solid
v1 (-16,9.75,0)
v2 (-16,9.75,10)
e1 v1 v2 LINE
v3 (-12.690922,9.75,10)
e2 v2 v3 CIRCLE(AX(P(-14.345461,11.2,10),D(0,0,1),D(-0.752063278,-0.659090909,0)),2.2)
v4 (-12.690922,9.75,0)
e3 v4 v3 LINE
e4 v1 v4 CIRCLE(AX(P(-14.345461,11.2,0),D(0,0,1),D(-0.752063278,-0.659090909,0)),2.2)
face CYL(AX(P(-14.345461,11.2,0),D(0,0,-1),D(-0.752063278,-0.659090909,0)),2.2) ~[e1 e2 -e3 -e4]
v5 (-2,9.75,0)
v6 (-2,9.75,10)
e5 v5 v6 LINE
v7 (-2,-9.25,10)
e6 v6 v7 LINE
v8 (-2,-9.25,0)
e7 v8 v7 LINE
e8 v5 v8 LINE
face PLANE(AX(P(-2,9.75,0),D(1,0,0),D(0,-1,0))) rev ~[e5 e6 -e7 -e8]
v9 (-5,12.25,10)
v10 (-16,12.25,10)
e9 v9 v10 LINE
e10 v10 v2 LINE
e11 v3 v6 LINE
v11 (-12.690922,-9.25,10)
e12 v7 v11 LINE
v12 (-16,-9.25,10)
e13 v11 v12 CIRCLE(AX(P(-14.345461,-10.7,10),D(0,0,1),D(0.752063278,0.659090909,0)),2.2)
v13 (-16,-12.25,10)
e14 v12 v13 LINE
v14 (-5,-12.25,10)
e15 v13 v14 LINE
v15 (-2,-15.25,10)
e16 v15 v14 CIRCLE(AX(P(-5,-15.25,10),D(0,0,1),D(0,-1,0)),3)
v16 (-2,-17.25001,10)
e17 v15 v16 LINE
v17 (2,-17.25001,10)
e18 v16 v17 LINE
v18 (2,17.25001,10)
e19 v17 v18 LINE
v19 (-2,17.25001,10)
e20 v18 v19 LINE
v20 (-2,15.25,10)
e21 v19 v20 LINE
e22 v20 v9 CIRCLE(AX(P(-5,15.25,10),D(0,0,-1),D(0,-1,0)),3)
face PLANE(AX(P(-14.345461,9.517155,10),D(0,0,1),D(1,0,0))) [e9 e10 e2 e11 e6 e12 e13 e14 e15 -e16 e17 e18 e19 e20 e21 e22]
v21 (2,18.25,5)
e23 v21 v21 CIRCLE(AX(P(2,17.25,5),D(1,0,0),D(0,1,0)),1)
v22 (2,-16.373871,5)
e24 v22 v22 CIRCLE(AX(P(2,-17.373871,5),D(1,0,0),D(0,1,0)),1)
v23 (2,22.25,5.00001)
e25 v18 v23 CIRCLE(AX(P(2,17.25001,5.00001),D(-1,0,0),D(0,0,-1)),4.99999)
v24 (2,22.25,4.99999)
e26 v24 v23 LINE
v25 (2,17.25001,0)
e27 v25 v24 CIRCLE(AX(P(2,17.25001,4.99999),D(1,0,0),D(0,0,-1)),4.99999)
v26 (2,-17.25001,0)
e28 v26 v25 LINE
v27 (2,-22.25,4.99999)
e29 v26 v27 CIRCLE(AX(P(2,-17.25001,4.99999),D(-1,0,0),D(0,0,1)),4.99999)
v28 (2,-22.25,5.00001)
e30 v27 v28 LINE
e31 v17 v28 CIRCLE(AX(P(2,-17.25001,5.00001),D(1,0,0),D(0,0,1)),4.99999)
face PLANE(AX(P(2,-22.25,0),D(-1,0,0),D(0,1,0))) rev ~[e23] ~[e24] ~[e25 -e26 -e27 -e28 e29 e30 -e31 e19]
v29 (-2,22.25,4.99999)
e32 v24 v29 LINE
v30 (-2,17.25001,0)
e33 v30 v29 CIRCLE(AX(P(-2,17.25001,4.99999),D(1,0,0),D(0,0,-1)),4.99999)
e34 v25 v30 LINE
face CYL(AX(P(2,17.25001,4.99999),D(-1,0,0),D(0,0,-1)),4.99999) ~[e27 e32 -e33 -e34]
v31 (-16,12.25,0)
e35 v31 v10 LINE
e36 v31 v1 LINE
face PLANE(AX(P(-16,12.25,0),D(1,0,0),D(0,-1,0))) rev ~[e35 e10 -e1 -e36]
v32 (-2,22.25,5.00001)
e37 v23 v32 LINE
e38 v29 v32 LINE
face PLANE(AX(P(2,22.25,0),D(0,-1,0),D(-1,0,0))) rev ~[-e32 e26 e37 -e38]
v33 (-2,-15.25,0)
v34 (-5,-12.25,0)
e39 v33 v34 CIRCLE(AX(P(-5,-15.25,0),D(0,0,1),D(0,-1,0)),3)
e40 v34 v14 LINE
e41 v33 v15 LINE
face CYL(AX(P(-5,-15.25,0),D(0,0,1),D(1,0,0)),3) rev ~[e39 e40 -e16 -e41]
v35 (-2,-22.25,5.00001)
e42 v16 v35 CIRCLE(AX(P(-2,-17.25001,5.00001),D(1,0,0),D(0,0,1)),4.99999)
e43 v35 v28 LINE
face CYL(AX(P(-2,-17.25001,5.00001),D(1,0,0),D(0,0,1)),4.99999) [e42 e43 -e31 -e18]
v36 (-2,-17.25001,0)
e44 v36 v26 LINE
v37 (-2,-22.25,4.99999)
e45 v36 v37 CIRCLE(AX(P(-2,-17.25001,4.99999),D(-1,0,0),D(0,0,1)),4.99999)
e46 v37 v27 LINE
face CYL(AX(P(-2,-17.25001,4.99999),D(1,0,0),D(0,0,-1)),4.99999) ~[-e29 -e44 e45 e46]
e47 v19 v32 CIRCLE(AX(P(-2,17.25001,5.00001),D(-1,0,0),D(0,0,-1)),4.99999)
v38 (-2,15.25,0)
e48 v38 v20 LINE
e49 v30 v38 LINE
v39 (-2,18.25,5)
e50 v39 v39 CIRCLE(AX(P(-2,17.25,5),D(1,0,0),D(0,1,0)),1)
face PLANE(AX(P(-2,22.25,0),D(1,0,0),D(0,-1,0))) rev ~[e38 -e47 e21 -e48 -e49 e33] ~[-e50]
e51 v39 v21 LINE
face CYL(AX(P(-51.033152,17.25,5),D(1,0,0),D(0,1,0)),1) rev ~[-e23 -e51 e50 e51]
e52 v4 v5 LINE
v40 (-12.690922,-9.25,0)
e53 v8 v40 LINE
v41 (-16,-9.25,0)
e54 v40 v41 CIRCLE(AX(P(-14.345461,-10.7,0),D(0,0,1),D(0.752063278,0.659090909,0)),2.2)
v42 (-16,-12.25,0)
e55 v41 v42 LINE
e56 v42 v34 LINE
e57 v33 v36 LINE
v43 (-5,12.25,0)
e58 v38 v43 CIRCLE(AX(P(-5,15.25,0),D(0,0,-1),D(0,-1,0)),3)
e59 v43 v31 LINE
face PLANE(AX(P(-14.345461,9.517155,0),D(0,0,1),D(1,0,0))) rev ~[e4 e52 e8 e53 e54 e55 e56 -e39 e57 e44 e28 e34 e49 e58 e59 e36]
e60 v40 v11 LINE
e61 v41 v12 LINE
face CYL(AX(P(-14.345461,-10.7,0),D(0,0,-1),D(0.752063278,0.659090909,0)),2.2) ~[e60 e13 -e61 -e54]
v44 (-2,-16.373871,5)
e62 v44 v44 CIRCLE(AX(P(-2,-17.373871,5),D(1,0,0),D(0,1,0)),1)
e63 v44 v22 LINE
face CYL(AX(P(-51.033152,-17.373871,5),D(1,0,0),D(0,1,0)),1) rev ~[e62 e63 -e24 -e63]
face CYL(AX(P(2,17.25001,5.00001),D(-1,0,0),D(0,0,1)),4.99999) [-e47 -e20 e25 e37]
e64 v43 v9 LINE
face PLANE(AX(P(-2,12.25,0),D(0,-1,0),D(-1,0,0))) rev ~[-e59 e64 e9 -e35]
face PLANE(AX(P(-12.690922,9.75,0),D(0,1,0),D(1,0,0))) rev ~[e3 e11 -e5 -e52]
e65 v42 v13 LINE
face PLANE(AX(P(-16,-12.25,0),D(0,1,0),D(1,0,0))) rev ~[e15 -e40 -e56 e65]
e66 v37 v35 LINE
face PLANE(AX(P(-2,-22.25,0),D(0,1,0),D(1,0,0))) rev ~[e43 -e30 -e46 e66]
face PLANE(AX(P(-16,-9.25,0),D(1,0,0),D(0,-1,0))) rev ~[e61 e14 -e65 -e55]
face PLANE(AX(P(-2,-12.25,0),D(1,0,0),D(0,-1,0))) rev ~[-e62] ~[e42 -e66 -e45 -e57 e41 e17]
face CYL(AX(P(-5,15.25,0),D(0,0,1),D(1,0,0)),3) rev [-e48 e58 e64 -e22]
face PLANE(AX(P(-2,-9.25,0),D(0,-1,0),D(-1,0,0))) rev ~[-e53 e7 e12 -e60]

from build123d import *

# Parameters (mm, degrees)
F1_DEPTH = 10
F3_D     = 2
F4_R     = 4.99999
F5_R     = 3


# Not quite as in the source:
# - a fillet or chamfer is up to 0.001 mm smaller than in the source, because OpenCascade refuses the exact size
# - a feature names something its author has since deleted; it is built from what else it names


with BuildPart() as f1:
    # F0 (on Top) → F1 (new body)
    with BuildSketch(Plane.XY):
        with BuildLine():
            Line((-12.6909215784, 9.75), (-16, 9.75))
            ThreePointArc((-16, 9.75), (-14.3454607892, 9), (-12.6909215784, 9.75))
        make_face()
        Polygon((2, -22.25), (2, -12.25), (2, 12.25), (2, 22.25), (-2, 22.25), (-2, 12.25), (-16, 12.25), (-16, 9.75), (-12.6909215784, 9.75), (-2, 9.75), (-2, -9.25), (-12.6909215784, -9.25), (-16, -9.25), (-16, -12.25), (-2, -12.25), (-2, -22.25), align=None)
        with BuildLine():
            ThreePointArc((-12.6909215784, -9.25), (-14.3454607892, -8.5), (-16, -9.25))
            Line((-16, -9.25), (-12.6909215784, -9.25))
        make_face()
    extrude(amount=F1_DEPTH)

    # F3 (through all)
    with Locations(Plane(origin=(-2, 0, 0), x_dir=(0, -1, 0), z_dir=(-1, 0, 0))):
        with Locations((-17.25, 5), (17.3738710582, 5)):
            Hole(F3_D / 2)

    # F4 (radius 5 in the source; OpenCascade refuses exactly that, so slightly less here)
    f4_edges = [f1.edges().sort_by_distance(p)[0] for p in [
        (0, 22.25, 10),
        (0, -22.25, 10),
        (0, -22.25, 0),
        (0, 22.25, 0),
    ]]
    fillet(f4_edges, radius=F4_R)

    # F5
    f5_edges = [f1.edges().sort_by_distance(p)[0] for p in [
        (-2, 12.25, 5),
        (-2, -12.25, 5),
    ]]
    fillet(f5_edges, radius=F5_R)


solid = f1.part
